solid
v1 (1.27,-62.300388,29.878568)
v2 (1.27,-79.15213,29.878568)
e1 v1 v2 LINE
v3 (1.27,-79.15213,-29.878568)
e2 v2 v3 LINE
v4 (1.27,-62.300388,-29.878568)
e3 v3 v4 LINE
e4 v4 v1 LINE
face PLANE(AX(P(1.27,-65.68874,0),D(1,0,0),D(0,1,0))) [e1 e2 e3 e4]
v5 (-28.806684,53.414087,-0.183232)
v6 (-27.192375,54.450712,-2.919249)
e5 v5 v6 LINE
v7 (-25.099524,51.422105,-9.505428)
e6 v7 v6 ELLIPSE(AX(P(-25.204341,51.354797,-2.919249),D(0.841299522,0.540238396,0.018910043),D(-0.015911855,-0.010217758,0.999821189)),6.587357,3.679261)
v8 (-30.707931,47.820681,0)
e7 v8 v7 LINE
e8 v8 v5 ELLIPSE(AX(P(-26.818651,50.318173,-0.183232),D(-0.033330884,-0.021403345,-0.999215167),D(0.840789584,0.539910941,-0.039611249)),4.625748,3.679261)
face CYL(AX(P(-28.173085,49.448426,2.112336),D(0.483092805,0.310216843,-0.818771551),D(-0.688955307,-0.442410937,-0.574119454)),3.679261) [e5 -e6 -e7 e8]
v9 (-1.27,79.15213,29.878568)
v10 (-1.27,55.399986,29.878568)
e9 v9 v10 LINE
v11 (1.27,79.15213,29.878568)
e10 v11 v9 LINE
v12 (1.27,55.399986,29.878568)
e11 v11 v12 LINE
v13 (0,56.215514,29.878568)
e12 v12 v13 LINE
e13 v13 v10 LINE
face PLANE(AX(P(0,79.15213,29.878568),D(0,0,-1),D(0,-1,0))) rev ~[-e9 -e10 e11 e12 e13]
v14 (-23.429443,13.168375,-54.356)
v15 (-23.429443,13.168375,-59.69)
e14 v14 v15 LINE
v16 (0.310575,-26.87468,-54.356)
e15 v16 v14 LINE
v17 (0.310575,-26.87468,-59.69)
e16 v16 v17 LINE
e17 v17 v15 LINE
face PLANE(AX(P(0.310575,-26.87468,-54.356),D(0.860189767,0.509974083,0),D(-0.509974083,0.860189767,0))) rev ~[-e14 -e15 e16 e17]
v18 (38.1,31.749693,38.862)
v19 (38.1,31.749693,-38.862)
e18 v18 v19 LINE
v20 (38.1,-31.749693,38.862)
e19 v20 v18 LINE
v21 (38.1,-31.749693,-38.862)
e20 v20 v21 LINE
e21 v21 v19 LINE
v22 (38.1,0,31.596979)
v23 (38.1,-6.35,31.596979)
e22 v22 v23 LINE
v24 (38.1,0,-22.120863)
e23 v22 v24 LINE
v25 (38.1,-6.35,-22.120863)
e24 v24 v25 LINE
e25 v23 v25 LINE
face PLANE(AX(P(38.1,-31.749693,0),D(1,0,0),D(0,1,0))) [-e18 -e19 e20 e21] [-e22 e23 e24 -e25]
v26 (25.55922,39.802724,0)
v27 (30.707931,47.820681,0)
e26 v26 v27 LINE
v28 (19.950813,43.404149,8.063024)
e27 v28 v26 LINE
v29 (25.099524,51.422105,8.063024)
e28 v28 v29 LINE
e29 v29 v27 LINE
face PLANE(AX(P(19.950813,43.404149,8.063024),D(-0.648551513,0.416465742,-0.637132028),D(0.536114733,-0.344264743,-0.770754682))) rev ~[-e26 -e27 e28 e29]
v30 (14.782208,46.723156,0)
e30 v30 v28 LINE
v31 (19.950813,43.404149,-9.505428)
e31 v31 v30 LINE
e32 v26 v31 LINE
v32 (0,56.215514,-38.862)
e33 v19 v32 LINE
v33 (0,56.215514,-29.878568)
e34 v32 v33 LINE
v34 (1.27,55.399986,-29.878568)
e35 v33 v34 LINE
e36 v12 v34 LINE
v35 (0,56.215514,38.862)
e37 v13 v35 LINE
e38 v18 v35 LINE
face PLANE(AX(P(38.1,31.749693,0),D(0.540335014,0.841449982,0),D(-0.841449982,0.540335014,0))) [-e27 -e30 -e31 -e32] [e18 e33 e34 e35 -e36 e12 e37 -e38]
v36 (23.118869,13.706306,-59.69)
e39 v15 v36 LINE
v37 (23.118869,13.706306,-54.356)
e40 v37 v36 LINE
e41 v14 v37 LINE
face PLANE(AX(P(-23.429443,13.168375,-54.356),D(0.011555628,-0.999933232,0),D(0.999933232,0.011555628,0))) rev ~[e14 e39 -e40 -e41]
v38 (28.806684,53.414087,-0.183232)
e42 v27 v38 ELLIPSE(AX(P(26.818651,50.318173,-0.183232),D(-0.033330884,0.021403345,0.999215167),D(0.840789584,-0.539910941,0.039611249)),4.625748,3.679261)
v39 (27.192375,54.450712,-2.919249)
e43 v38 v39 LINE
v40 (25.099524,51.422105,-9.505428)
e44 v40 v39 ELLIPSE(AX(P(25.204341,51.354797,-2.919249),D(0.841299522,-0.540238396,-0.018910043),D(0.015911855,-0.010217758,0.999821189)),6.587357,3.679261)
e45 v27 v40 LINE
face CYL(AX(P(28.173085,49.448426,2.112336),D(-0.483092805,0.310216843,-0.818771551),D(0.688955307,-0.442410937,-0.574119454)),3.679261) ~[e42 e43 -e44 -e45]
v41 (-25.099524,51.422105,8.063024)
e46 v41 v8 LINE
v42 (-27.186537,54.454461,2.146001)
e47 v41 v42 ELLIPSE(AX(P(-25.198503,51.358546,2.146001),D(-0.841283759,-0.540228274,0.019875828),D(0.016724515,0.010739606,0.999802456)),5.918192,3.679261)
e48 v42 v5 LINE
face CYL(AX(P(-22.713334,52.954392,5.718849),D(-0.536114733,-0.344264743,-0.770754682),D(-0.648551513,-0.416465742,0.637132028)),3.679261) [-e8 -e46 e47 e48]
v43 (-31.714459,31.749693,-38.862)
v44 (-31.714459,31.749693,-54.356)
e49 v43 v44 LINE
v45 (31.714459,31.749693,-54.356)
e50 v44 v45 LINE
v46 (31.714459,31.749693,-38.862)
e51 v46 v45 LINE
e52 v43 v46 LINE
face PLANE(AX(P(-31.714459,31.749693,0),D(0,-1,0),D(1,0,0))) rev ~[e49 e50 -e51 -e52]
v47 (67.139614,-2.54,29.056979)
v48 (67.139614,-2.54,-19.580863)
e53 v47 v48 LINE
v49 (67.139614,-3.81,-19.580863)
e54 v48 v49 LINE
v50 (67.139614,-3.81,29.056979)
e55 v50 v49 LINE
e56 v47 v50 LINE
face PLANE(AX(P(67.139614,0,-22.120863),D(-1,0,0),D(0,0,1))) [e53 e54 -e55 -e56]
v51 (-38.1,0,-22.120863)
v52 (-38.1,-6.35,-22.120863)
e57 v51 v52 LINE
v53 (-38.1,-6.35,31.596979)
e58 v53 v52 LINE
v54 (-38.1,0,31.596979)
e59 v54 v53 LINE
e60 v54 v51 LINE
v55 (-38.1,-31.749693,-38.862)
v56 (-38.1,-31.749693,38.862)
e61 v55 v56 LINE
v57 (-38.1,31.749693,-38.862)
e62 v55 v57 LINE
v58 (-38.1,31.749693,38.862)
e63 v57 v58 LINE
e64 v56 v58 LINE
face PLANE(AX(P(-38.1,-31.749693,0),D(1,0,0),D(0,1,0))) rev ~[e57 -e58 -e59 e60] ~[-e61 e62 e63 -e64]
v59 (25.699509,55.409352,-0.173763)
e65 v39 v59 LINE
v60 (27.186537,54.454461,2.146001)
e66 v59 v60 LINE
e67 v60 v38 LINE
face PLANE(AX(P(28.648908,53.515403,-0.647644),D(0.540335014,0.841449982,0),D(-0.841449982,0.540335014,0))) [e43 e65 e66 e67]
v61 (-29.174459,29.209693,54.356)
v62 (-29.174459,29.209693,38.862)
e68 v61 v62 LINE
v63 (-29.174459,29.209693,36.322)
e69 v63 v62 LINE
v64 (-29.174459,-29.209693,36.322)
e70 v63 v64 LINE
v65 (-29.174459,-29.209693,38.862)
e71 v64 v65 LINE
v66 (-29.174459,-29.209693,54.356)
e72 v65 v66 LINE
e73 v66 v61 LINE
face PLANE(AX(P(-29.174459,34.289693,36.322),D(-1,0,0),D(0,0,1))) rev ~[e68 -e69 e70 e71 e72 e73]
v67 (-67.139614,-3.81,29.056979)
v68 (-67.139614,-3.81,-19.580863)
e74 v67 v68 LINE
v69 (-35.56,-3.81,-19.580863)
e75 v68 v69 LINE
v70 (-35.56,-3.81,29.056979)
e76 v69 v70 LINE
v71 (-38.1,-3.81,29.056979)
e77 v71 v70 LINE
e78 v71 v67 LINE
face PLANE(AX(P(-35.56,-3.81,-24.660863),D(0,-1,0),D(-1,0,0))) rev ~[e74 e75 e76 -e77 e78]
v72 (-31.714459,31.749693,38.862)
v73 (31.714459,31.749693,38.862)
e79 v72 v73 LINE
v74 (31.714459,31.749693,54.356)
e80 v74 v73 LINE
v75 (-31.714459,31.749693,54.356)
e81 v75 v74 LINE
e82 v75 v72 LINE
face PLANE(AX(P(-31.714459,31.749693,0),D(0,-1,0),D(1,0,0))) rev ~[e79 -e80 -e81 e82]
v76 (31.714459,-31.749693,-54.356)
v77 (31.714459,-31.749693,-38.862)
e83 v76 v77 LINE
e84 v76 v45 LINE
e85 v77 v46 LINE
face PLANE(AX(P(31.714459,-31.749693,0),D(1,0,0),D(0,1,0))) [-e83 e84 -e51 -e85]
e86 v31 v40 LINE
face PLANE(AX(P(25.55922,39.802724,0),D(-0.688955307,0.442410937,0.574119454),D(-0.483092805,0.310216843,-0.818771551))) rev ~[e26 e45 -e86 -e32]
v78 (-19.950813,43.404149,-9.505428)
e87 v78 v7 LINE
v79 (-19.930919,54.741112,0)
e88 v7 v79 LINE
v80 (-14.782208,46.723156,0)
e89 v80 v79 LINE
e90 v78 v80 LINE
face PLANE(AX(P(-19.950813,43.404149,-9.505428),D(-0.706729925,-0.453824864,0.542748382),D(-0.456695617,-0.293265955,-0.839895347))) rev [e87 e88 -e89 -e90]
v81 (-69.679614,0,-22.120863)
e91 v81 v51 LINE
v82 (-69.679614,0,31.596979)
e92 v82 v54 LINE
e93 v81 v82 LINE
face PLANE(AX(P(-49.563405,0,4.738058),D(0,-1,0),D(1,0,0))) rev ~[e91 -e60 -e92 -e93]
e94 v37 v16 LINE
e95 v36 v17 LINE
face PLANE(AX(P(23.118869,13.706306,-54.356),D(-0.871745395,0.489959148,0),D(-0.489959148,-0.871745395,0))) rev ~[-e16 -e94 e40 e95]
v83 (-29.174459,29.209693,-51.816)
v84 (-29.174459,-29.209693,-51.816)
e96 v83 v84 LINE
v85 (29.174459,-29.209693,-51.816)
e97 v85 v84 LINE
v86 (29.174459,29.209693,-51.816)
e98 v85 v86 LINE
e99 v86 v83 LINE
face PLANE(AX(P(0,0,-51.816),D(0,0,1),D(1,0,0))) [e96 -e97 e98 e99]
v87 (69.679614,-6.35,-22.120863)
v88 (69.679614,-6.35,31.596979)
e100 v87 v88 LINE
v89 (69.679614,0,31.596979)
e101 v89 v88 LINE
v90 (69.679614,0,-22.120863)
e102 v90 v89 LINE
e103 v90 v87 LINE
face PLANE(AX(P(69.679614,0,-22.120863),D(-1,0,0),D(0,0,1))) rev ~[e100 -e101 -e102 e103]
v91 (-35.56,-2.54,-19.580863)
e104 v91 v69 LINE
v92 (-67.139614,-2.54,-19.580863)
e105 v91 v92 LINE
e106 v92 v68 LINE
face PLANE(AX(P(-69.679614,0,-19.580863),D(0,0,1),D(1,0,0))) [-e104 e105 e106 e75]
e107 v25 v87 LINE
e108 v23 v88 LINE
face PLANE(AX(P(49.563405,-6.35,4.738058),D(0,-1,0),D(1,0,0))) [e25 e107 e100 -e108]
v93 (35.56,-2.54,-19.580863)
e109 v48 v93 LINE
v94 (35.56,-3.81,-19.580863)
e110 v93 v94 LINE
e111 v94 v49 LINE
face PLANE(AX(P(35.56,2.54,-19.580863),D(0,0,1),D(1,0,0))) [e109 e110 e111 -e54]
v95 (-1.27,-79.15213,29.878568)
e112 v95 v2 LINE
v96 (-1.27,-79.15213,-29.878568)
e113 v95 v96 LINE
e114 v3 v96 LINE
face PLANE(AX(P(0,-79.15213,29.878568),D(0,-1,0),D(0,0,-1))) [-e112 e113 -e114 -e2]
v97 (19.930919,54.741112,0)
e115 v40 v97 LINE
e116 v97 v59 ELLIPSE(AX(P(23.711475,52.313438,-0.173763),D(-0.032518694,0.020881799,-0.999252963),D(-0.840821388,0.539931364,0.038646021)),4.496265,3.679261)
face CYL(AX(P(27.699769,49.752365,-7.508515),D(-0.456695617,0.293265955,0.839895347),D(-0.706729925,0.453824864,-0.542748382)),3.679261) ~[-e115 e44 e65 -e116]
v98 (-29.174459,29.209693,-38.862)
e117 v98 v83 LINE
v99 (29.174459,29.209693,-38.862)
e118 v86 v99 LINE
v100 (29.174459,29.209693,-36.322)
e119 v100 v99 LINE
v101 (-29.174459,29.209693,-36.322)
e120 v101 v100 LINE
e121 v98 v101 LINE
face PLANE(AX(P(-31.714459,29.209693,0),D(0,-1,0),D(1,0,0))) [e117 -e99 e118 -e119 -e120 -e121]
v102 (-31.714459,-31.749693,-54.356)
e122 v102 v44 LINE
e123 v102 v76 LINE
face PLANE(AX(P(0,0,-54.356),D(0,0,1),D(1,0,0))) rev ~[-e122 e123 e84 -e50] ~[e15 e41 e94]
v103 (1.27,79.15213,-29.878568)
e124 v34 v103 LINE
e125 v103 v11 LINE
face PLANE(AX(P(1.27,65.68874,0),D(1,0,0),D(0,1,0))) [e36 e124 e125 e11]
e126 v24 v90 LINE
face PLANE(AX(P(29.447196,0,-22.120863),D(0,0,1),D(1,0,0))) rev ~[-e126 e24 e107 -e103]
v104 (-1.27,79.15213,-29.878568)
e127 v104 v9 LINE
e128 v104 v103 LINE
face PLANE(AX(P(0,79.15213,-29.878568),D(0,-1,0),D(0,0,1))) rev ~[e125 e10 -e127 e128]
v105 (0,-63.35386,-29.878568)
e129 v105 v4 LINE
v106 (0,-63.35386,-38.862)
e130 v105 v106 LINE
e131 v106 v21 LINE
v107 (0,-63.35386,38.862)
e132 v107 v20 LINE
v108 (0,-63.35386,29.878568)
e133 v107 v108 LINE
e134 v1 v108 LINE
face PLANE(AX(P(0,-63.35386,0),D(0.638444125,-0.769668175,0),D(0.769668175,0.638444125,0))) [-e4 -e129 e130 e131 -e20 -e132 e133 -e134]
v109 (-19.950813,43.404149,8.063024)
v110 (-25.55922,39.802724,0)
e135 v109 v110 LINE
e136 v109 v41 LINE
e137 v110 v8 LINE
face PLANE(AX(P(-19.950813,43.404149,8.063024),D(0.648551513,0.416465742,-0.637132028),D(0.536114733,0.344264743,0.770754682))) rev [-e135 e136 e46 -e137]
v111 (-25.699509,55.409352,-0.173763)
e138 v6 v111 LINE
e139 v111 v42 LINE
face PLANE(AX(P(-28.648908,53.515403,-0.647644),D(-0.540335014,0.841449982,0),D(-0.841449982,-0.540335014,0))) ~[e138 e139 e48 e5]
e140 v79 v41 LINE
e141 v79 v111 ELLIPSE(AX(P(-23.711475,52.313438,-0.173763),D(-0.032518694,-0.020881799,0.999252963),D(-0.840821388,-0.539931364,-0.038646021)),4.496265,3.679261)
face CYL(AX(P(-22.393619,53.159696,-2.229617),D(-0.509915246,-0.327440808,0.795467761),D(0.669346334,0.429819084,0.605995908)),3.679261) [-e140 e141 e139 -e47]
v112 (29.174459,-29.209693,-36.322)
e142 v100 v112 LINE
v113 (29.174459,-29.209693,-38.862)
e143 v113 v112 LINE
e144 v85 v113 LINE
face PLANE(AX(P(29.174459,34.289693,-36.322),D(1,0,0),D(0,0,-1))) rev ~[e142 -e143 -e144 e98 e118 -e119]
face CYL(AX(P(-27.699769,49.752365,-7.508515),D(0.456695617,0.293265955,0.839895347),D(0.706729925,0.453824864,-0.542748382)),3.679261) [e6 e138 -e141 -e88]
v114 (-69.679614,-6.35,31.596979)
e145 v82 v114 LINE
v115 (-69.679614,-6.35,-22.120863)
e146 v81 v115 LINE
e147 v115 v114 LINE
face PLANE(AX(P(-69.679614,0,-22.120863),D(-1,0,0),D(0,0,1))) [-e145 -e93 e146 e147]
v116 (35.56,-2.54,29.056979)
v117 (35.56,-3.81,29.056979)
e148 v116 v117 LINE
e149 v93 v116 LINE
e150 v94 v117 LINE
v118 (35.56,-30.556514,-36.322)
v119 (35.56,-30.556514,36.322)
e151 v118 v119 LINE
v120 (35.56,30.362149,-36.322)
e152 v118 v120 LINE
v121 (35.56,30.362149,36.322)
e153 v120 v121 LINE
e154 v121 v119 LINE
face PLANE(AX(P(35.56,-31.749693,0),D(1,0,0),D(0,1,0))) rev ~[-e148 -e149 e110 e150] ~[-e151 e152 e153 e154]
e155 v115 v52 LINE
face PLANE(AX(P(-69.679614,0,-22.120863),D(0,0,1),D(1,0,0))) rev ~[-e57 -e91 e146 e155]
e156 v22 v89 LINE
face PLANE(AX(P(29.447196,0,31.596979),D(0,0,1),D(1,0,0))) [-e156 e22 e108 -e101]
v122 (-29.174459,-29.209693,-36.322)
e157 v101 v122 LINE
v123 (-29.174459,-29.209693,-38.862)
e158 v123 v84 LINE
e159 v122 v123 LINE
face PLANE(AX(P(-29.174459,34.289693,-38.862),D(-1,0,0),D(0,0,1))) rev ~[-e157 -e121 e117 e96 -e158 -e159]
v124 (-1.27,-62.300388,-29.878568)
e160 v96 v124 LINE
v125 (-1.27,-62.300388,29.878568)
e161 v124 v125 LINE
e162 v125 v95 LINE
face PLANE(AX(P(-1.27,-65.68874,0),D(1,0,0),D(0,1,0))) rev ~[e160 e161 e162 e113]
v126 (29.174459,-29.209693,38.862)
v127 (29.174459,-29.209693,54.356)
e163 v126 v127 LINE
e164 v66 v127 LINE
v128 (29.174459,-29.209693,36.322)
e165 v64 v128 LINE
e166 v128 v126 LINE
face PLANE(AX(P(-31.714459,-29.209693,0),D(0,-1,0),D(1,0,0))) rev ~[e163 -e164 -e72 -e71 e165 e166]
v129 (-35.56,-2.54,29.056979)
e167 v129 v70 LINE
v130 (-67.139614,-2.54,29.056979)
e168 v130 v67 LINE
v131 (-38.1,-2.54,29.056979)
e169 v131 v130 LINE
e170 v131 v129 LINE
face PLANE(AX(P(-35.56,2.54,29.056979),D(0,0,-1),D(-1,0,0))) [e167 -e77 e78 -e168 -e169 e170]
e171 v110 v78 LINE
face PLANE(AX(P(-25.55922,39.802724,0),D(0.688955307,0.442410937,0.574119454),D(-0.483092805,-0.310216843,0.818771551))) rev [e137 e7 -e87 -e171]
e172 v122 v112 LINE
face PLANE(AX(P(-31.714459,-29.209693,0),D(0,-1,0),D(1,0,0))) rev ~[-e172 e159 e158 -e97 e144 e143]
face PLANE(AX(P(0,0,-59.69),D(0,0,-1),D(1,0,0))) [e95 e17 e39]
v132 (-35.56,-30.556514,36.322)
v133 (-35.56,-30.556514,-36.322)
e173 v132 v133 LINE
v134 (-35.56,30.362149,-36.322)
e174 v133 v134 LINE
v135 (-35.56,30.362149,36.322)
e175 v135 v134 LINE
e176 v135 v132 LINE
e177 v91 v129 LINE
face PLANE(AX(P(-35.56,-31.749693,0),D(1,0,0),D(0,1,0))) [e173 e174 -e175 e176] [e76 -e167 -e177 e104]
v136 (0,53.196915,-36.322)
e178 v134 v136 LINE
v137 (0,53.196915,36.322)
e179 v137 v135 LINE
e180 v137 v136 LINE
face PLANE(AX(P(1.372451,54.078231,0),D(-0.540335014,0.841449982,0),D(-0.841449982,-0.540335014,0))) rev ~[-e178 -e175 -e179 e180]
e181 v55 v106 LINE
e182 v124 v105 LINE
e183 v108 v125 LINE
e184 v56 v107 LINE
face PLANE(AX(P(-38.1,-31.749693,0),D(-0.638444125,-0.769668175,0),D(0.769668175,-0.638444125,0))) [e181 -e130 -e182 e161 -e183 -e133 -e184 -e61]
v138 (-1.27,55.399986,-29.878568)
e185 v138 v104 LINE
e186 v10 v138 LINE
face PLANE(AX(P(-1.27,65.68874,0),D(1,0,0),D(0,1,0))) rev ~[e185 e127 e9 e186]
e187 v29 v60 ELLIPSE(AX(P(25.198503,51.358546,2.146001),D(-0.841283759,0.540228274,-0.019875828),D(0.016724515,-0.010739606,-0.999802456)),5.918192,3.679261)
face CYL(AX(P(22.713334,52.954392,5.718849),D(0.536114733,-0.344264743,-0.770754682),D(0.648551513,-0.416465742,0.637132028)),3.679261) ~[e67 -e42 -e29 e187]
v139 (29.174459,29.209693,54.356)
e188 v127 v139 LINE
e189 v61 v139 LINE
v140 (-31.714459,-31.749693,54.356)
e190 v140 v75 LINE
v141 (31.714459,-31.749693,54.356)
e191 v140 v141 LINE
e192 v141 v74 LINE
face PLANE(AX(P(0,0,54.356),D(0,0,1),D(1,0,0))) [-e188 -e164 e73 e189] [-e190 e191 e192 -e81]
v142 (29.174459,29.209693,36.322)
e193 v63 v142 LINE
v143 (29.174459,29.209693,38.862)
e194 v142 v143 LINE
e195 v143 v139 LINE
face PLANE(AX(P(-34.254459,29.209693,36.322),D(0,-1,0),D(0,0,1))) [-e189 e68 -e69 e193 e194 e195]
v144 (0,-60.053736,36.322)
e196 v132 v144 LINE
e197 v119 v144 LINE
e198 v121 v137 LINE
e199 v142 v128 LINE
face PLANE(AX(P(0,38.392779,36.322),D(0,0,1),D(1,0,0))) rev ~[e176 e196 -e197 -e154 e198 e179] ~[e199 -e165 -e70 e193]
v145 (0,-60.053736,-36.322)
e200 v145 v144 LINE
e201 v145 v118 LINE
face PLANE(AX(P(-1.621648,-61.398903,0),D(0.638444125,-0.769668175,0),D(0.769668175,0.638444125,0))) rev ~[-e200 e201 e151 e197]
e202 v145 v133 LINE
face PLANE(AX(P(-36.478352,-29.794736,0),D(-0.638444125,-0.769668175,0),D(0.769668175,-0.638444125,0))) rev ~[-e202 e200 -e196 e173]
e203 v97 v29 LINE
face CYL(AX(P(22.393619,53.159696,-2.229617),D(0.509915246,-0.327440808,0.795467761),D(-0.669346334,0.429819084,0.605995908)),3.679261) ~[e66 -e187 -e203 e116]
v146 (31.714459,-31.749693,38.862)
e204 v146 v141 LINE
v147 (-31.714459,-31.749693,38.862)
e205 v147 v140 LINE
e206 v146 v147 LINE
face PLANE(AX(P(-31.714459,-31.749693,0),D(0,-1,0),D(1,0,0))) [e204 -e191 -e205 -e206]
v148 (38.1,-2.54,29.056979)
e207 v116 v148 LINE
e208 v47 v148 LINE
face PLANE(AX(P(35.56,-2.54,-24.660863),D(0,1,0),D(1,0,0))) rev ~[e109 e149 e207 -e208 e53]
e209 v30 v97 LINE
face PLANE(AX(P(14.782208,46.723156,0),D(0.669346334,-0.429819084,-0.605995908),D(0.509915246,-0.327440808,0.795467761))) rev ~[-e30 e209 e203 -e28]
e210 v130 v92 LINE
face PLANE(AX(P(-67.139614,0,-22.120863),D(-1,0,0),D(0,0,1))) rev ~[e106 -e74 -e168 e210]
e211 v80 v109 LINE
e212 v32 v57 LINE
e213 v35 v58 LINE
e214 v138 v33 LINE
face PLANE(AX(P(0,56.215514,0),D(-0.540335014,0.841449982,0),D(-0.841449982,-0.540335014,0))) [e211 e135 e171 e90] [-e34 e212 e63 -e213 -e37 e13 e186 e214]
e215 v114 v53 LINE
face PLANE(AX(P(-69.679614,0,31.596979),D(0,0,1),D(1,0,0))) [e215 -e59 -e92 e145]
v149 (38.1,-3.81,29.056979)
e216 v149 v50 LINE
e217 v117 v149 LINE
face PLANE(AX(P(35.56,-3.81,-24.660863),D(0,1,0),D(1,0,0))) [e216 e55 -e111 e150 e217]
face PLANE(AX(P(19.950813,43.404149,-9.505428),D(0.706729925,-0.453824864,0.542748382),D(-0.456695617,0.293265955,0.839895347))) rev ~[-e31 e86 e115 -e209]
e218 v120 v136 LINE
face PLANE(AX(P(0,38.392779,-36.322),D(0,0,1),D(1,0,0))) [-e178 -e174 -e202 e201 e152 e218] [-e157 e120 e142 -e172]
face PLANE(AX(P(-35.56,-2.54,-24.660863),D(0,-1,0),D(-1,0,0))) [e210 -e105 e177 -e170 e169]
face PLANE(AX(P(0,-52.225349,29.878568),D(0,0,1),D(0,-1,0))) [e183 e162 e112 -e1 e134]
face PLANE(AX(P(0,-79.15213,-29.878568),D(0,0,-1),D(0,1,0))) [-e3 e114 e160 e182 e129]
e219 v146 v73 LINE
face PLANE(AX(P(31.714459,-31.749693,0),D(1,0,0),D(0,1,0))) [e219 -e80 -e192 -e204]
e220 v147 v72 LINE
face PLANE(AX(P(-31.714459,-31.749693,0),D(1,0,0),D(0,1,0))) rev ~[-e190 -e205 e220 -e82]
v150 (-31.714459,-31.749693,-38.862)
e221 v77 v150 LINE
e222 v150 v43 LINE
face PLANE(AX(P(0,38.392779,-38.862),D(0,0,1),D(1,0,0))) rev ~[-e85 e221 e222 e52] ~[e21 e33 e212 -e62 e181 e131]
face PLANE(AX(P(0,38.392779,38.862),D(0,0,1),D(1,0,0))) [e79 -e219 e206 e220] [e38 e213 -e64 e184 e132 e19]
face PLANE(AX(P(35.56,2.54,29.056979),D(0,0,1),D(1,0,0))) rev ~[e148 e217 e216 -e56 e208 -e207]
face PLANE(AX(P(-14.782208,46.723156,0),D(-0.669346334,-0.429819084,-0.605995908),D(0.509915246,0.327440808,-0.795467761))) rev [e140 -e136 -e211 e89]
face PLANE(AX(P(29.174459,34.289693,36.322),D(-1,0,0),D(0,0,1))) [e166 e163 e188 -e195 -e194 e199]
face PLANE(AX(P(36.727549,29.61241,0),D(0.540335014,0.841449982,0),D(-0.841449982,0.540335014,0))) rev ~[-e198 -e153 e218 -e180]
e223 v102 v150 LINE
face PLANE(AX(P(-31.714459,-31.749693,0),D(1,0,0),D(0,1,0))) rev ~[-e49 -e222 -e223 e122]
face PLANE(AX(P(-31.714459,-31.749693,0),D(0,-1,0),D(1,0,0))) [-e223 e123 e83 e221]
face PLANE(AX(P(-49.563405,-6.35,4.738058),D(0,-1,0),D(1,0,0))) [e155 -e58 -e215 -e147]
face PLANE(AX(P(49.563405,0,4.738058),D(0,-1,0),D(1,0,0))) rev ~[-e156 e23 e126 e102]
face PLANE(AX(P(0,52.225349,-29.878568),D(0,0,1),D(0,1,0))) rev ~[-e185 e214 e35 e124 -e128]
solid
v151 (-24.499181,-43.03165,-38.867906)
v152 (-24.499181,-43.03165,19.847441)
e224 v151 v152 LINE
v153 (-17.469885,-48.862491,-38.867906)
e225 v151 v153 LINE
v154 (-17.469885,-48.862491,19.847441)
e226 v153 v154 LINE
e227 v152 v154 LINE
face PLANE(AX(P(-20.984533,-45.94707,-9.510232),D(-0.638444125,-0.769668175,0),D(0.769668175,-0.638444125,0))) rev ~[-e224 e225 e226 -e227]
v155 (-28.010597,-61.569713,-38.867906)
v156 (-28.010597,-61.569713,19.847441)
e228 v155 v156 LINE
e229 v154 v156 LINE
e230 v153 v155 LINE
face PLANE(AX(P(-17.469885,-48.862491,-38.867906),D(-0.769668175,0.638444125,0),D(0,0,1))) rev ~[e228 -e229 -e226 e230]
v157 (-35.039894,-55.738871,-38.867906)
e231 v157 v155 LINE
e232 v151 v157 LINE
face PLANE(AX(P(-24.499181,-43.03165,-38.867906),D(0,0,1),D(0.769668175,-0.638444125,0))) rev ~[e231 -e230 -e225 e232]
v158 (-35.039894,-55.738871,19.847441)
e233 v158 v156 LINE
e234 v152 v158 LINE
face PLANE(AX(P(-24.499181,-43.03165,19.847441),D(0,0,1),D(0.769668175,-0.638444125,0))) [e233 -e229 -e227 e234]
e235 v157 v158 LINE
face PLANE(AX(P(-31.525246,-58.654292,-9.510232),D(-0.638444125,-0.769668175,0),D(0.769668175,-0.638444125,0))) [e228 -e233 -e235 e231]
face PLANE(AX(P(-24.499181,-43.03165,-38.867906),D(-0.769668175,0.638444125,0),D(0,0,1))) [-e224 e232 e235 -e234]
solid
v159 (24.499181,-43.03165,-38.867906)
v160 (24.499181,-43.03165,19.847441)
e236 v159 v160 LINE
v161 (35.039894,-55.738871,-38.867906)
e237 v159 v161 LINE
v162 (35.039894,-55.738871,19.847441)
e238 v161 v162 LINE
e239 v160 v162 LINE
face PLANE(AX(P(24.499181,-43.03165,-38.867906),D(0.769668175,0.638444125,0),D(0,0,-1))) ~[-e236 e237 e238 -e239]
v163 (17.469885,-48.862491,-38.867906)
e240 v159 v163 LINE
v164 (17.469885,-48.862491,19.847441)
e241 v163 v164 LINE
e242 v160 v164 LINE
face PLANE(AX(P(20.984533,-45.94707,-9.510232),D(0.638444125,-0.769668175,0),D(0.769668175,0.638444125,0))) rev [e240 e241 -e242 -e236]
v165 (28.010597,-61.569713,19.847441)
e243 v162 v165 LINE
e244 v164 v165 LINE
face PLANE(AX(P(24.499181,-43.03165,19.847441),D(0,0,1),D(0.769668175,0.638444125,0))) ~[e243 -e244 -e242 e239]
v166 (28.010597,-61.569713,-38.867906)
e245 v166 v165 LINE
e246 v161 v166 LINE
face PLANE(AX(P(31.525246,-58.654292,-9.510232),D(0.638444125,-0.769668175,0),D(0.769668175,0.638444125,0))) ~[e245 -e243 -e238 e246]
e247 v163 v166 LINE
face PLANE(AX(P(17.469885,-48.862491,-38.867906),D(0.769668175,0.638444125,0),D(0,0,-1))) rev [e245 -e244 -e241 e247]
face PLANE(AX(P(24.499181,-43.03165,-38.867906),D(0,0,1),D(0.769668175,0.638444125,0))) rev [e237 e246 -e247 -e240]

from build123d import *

# Parameters (mm, degrees)
F0_W         = 6.3855407542
F0_H         = 63.4993868415
F3_DEPTH     = 38.862
F0_W_2       = 63.4289184916
F4_DEPTH     = 54.356
F5_DEPTH     = 1.27
F1_W         = 40.2324178779
F1_H         = 53.7178423256
F6_DEPTH     = 6.35
F7_T         = 2.54
F7_T3_DEPTH  = 68.5793868415
F7_T5_DEPTH  = 68.5089184916
F7_T7_DEPTH  = 6.5892994553
F7_T9_DEPTH  = 64.8371359067
F7_T11_DEPTH = 6.5892994553
F7_T13_DEPTH = 58.7978423256
F7_T15_DEPTH = 11.43
F7_T17_DEPTH = 6.7300617299
F7_T19_DEPTH = 6.7300617299
F7_T21_DEPTH = 6.7300617299
F7_T23_DEPTH = 6.7300617299
F7_T25_DEPTH = 6.5892994553
F7_T27_DEPTH = 6.5892994553
F9_DEPTH     = 5.334
F11_DEPTH    = 13.208
F12_R        = 3.6792614691
F13_W        = 9.1328918934
F13_H        = 58.7153472006
F14_DEPTH    = 16.51


# Not quite as in the source:
# - a pattern or mirror of a feature is missing from the dataset's text; its kind, count and spacing are read off the source's solid
# - a shell that OpenCascade refuses in one call is made with other operations: the cavity is built on its own and cut out


with BuildPart() as f3:
    # F0 (on Top) → F3 (new body, symmetric)
    with BuildSketch(Plane.XY):
        Polygon((31.7144592458, 31.7496934207), (38.1, 31.7496934207), (0, 56.2155136837), (-38.1, 31.7496934207), (-31.7144592458, 31.7496934207), align=None)
        Polygon((0, -63.3538599396), (38.1, -31.7496934207), (31.7144592458, -31.7496934207), (-31.7144592458, -31.7496934207), (-38.1, -31.7496934207), align=None)
        with Locations((-34.9072296229, 0)):
            Rectangle(F0_W, F0_H)
        with Locations((34.9072296229, 0)):
            Rectangle(F0_W, F0_H)
    extrude(amount=F3_DEPTH, both=True)

    # F0 (on Top) → F4 (join, symmetric)
    with BuildSketch(Plane.XY):
        Rectangle(F0_W_2, F0_H)
    extrude(amount=F4_DEPTH, both=True)

    # F2 (on Right) → F5 (join, symmetric)
    with BuildSketch(Plane.YZ):
        Polygon((52.2253494244, 29.8785679533), (52.2253494244, 0), (52.2253494244, -29.8785679533), (79.1521295905, -29.8785679533), (79.1521295905, 29.8785679533), align=None)
        Polygon((-52.2253494244, -29.8785679533), (-52.2253494244, 0), (-52.2253494244, 29.8785679533), (-79.1521295905, 29.8785679533), (-79.1521295905, -29.8785679533), align=None)
    extrude(amount=F5_DEPTH, both=True)

    # F1 (on Front) → F6 (join)
    with BuildSketch(Plane.XZ):
        with Locations((49.563405104, 4.7380579636)):
            Rectangle(F1_W, F1_H)
        with Locations((-49.563405104, 4.7380579636)):
            Rectangle(F1_W, F1_H)
    extrude(amount=F6_DEPTH)

    # F7: shell of thickness 2.54, made by hand


with BuildPart() as f7_core1:
    # F7_t2: copy of F3
    add(f3.part)

    # the walls: a layer under each face that stays
    f7_faces = [f7_core1.faces().sort_by_distance(p)[0] for p in [
        (-31.7144592458, 0, -46.609),
        (0, 31.7496934207, -46.609),
        (-25.4, 36.2872847465, -38.862),
        (0, -31.7496934207, -46.609),
        (0, 0, -54.356),
        (31.7144592458, 0, -46.609),
        (-19.05, 43.9826035522, 0),
        (-38.1, 21.1664622805, -25.908),
        (-19.05, -47.5517766802, 0),
        (19.05, -47.5517766802, 0),
        (38.1, -21.1664622805, -25.908),
        (19.05, 43.9826035522, 0),
        (0, 67.276057966, -29.8785679533),
        (-1.27, 67.276057966, 0),
        (0, 67.276057966, 29.8785679533),
        (-25.4, 36.2872847465, 38.862),
        (-53.8898070215, 0, 4.7380579636),
        (-53.8898070215, -3.175, -22.1208631992),
        (-53.8898070215, -6.35, 4.7380579636),
        (-53.8898070215, -3.175, 31.5969791263),
        (0, -70.7262586564, 29.8785679533),
        (-1.27, -70.7262586564, 0),
        (0, -70.7262586564, -29.8785679533),
        (1.27, -70.7262586564, 0),
        (53.8898070215, 0, 4.7380579636),
        (53.8898070215, -3.175, 31.5969791263),
        (53.8898070215, -6.35, 4.7380579636),
        (53.8898070215, -3.175, -22.1208631992),
        (1.27, 67.276057966, 0),
        (0, 79.1521295905, 0),
        (0, -31.7496934207, 46.609),
        (-31.7144592458, 0, 46.609),
        (0, 31.7496934207, 46.609),
        (31.7144592458, 0, 46.609),
        (-69.679614043, -3.175, 4.7380579636),
        (0, -79.1521295905, 0),
        (69.679614043, -3.175, 4.7380579636),
    ]]
    thicken(f7_faces, amount=-F7_T, mode=Mode.SUBTRACT)

    # F7_s4 → F7_t3 (cut)
    with BuildSketch(Plane.XZ.offset(-34.2896934207)):
        Polygon((-31.7398592458, -38.8874), (-29.1744592458, -38.862), (-29.1744592458, -36.322), (-31.7144592458, -36.322), align=None)
        Polygon((31.7398592458, -38.8874), (31.7144592458, -36.322), (29.1744592458, -36.322), (29.1744592458, -38.862), align=None)
        Polygon((-31.7398592458, 38.8874), (-31.7144592458, 36.322), (-29.1744592458, 36.322), (-29.1744592458, 38.862), align=None)
        Polygon((31.7398592458, 38.8874), (31.7144592458, 36.322), (29.1744592458, 36.322), (29.1744592458, 38.862), align=None)
    extrude(amount=F7_T3_DEPTH, mode=Mode.SUBTRACT)

    # F7_s6 → F7_t5 (cut)
    with BuildSketch(Plane.YZ.offset(-34.2544592458)):
        Polygon((31.7750934207, -38.8874), (29.2096934207, -38.862), (29.2096934207, -36.322), (31.7496934207, -36.322), align=None)
        Polygon((-31.7750934207, -38.8874), (-31.7496934207, -36.322), (-29.2096934207, -36.322), (-29.2096934207, -38.862), align=None)
        Polygon((-31.7750934207, 38.8874), (-31.7496934207, 36.322), (-29.2096934207, 36.322), (-29.2096934207, 38.862), align=None)
        Polygon((31.7750934207, 38.8874), (31.7496934207, 36.322), (29.2096934207, 36.322), (29.2096934207, 38.862), align=None)
    extrude(amount=F7_T5_DEPTH, mode=Mode.SUBTRACT)

    # F7_s8 → F7_t7 (cut)
    with BuildSketch(Plane(origin=(27.6965031812, 17.7852406494, 0), x_dir=(0, 0, 1), z_dir=(-0.8414499823, -0.5403350139, 0))):
        Polygon((-29.9039679533, 47.3279429967), (-29.8785679533, 44.7625429967), (-27.3385679533, 44.7625429967), (-27.3385679533, 47.3025429967), align=None)
    extrude(amount=F7_T7_DEPTH, mode=Mode.SUBTRACT)

    # F7_s10 → F7_t9 (cut)
    with BuildSketch(Plane.XY.offset(-32.4185679533)):
        Polygon((-1.3091245094, 55.4213591711), (0.1024509352, 53.2627033864), (1.27, 54.0124421152), (1.27, 55.3999863416), align=None)
        Polygon((-1.3116164808, -62.319937294), (0.3516480774, -60.3454305583), (1.27, -61.1072086971), (1.27, -62.3003877224), align=None)
        Polygon((1.3116164808, -62.319937294), (-0.3516480774, -60.3454305583), (-1.27, -61.1072086971), (-1.27, -62.3003877224), align=None)
        Polygon((1.3091245094, 55.4213591711), (-0.1024509352, 53.2627033864), (-1.27, 54.0124421152), (-1.27, 55.3999863416), align=None)
    extrude(amount=F7_T9_DEPTH, mode=Mode.SUBTRACT)

    # F7_s12 → F7_t11 (cut)
    with BuildSketch(Plane(origin=(22.1519372709, 14.2248114369, 0), x_dir=(0, 0, 1), z_dir=(0.8414499823, 0.5403350139, 0))):
        Polygon((29.9039679533, -47.3279429967), (29.8785679533, -44.7625429967), (27.3385679533, -44.7625429967), (27.3385679533, -47.3025429967), align=None)
    extrude(amount=F7_T11_DEPTH, mode=Mode.SUBTRACT)

    # F7_s14 → F7_t13 (cut)
    with BuildSketch(Plane.XY.offset(-24.6608631992)):
        Polygon((-38.1254, 0.0254), (-35.56, 0), (-35.56, -2.54), (-38.1, -2.54), align=None)
        Polygon((-38.1254, -6.3754), (-35.56, -6.35), (-35.56, -3.81), (-38.1, -3.81), align=None)
        Polygon((38.1254, 0.0254), (35.56, 0), (35.56, -2.54), (38.1, -2.54), align=None)
        Polygon((38.1254, -6.3754), (35.56, -6.35), (35.56, -3.81), (38.1, -3.81), align=None)
    extrude(amount=F7_T13_DEPTH, mode=Mode.SUBTRACT)

    # F7_s16 → F7_t15 (cut)
    with BuildSketch(Plane.XZ.offset(-2.54)):
        Polygon((-38.1254, -22.1462631992), (-35.56, -22.1208631992), (-35.56, -19.5808631992), (-38.1, -19.5808631992), align=None)
        Polygon((-38.1254, 31.6223791263), (-35.56, 31.5969791263), (-35.56, 29.0569791263), (-38.1, 29.0569791263), align=None)
        Polygon((38.1254, 31.6223791263), (35.56, 31.5969791263), (35.56, 29.0569791263), (38.1, 29.0569791263), align=None)
        Polygon((38.1254, -22.1462631992), (35.56, -22.1208631992), (35.56, -19.5808631992), (38.1, -19.5808631992), align=None)
    extrude(amount=F7_T15_DEPTH, mode=Mode.SUBTRACT)

    # F7_s18 → F7_t17 (cut)
    with BuildSketch(Plane(origin=(33.0864182791, -27.4453719897, 0), x_dir=(0, 0, 1), z_dir=(-0.7696681748, 0.638444125, 0))):
        Polygon((29.9039679533, -48.7868497466), (29.8785679533, -46.2214497466), (27.3385679533, -46.2214497466), (27.3385679533, -48.7614497466), align=None)
    extrude(amount=F7_T17_DEPTH, mode=Mode.SUBTRACT)

    # F7_s20 → F7_t19 (cut)
    with BuildSketch(Plane(origin=(27.9065039511, -23.1486036176, 0), x_dir=(0, 0, 1), z_dir=(0.7696681748, -0.638444125, 0))):
        Polygon((-29.9039679533, 48.7868497466), (-29.8785679533, 46.2214497466), (-27.3385679533, 46.2214497466), (-27.3385679533, 48.7614497466), align=None)
    extrude(amount=F7_T19_DEPTH, mode=Mode.SUBTRACT)

    # F7_s22 → F7_t21 (cut)
    with BuildSketch(Plane(origin=(-33.0864182791, -27.4453719897, 0), x_dir=(0, 0, 1), z_dir=(0.7696681748, 0.638444125, 0))):
        Polygon((-29.9039679533, 48.7868497466), (-29.8785679533, 46.2214497466), (-27.3385679533, 46.2214497466), (-27.3385679533, 48.7614497466), align=None)
    extrude(amount=F7_T21_DEPTH, mode=Mode.SUBTRACT)

    # F7_s24 → F7_t23 (cut)
    with BuildSketch(Plane(origin=(-27.9065039511, -23.1486036176, 0), x_dir=(0, 0, 1), z_dir=(-0.7696681748, -0.638444125, 0))):
        Polygon((29.9039679533, -48.7868497466), (29.8785679533, -46.2214497466), (27.3385679533, -46.2214497466), (27.3385679533, -48.7614497466), align=None)
    extrude(amount=F7_T23_DEPTH, mode=Mode.SUBTRACT)

    # F7_s26 → F7_t25 (cut)
    with BuildSketch(Plane(origin=(-27.6965031812, 17.7852406494, 0), x_dir=(0, 0, 1), z_dir=(0.8414499823, -0.5403350139, 0))):
        Polygon((29.9039679533, -47.3279429967), (29.8785679533, -44.7625429967), (27.3385679533, -44.7625429967), (27.3385679533, -47.3025429967), align=None)
    extrude(amount=F7_T25_DEPTH, mode=Mode.SUBTRACT)

    # F7_s28 → F7_t27 (cut)
    with BuildSketch(Plane(origin=(-22.1519372709, 14.2248114369, 0), x_dir=(0, 0, 1), z_dir=(-0.8414499823, 0.5403350139, 0))):
        Polygon((-29.9039679533, 47.3279429967), (-29.8785679533, 44.7625429967), (-27.3385679533, 44.7625429967), (-27.3385679533, 47.3025429967), align=None)
    extrude(amount=F7_T27_DEPTH, mode=Mode.SUBTRACT)


with BuildPart() as f3_1:
    add(f3.part)

    # what is left inside the walls is the cavity
    f7_cavity = [f7_core1.part.solids().sort_by_distance(p)[0] for p in [
        (-35.5346, -0.097183, -12.107333),
    ]]
    add(f7_cavity, mode=Mode.SUBTRACT)

    # F8 (on face) → F9 (join)
    with BuildSketch(Plane(origin=(0, 0, -54.356), x_dir=(1, 0, 0), z_dir=(0, 0, -1))):
        Polygon((23.1188687153, -13.7063056679), (0.3105745427, 26.8746804482), (-23.4294432581, -13.1683747803), align=None)
    extrude(amount=F9_DEPTH)

    # F10 (on face) → F11 (join)
    with BuildSketch(Plane(origin=(25.559220226, 39.8027239695, 0), x_dir=(-0.8414499823, 0.5403350139, 0), z_dir=(0.5403350139, 0.8414499823, 0))):
        Polygon((6.6651697271, -9.5054283738), (6.6651697271, 0), (6.6651697271, 8.0630239099), (0, 0), align=None)
        Polygon((6.6651697271, 8.0630239099), (6.6651697271, 0), (6.6651697271, -9.5054283738), (12.8076681867, 0), align=None)
    f11 = extrude(amount=F11_DEPTH)

    # F11_copies: F11 across plane
    add(f11.mirror(Plane(origin=(0, 0, 0), x_dir=(0, 0, -1), z_dir=(-1, 0, 0))))

    # F12
    f12_edges = [f3_1.edges().sort_by_distance(p)[0] for p in [
        (29.891762, 52.717308, 4.031512),
        (24.503256, 56.177523, -4.752714),
        (24.503256, 56.177523, 4.031512),
        (29.891762, 52.717308, -4.752714),
        (-24.503256, 56.177523, 4.031512),
        (-24.503256, 56.177523, -4.752714),
        (-29.891762, 52.717308, -4.752714),
        (-29.891762, 52.717308, 4.031512),
    ]]
    fillet(f12_edges, radius=F12_R)


with BuildPart() as f14:
    # F13 (on face) → F14 (new body)
    with BuildSketch(Plane(origin=(-31.1314611151, -37.5301360273, 0), x_dir=(0.7696681748, -0.638444125, 0), z_dir=(-0.638444125, -0.7696681748, 0))):
        with Locations((13.183509931, -9.5102321357)):
            Rectangle(F13_W, F13_H)
    extrude(amount=F14_DEPTH)


with BuildPart() as f15_1:
    # F15: instance of F14
    add(f14.part.mirror(Plane.YZ))


solid = Compound([f3_1.part, f14.part, f15_1.part])
